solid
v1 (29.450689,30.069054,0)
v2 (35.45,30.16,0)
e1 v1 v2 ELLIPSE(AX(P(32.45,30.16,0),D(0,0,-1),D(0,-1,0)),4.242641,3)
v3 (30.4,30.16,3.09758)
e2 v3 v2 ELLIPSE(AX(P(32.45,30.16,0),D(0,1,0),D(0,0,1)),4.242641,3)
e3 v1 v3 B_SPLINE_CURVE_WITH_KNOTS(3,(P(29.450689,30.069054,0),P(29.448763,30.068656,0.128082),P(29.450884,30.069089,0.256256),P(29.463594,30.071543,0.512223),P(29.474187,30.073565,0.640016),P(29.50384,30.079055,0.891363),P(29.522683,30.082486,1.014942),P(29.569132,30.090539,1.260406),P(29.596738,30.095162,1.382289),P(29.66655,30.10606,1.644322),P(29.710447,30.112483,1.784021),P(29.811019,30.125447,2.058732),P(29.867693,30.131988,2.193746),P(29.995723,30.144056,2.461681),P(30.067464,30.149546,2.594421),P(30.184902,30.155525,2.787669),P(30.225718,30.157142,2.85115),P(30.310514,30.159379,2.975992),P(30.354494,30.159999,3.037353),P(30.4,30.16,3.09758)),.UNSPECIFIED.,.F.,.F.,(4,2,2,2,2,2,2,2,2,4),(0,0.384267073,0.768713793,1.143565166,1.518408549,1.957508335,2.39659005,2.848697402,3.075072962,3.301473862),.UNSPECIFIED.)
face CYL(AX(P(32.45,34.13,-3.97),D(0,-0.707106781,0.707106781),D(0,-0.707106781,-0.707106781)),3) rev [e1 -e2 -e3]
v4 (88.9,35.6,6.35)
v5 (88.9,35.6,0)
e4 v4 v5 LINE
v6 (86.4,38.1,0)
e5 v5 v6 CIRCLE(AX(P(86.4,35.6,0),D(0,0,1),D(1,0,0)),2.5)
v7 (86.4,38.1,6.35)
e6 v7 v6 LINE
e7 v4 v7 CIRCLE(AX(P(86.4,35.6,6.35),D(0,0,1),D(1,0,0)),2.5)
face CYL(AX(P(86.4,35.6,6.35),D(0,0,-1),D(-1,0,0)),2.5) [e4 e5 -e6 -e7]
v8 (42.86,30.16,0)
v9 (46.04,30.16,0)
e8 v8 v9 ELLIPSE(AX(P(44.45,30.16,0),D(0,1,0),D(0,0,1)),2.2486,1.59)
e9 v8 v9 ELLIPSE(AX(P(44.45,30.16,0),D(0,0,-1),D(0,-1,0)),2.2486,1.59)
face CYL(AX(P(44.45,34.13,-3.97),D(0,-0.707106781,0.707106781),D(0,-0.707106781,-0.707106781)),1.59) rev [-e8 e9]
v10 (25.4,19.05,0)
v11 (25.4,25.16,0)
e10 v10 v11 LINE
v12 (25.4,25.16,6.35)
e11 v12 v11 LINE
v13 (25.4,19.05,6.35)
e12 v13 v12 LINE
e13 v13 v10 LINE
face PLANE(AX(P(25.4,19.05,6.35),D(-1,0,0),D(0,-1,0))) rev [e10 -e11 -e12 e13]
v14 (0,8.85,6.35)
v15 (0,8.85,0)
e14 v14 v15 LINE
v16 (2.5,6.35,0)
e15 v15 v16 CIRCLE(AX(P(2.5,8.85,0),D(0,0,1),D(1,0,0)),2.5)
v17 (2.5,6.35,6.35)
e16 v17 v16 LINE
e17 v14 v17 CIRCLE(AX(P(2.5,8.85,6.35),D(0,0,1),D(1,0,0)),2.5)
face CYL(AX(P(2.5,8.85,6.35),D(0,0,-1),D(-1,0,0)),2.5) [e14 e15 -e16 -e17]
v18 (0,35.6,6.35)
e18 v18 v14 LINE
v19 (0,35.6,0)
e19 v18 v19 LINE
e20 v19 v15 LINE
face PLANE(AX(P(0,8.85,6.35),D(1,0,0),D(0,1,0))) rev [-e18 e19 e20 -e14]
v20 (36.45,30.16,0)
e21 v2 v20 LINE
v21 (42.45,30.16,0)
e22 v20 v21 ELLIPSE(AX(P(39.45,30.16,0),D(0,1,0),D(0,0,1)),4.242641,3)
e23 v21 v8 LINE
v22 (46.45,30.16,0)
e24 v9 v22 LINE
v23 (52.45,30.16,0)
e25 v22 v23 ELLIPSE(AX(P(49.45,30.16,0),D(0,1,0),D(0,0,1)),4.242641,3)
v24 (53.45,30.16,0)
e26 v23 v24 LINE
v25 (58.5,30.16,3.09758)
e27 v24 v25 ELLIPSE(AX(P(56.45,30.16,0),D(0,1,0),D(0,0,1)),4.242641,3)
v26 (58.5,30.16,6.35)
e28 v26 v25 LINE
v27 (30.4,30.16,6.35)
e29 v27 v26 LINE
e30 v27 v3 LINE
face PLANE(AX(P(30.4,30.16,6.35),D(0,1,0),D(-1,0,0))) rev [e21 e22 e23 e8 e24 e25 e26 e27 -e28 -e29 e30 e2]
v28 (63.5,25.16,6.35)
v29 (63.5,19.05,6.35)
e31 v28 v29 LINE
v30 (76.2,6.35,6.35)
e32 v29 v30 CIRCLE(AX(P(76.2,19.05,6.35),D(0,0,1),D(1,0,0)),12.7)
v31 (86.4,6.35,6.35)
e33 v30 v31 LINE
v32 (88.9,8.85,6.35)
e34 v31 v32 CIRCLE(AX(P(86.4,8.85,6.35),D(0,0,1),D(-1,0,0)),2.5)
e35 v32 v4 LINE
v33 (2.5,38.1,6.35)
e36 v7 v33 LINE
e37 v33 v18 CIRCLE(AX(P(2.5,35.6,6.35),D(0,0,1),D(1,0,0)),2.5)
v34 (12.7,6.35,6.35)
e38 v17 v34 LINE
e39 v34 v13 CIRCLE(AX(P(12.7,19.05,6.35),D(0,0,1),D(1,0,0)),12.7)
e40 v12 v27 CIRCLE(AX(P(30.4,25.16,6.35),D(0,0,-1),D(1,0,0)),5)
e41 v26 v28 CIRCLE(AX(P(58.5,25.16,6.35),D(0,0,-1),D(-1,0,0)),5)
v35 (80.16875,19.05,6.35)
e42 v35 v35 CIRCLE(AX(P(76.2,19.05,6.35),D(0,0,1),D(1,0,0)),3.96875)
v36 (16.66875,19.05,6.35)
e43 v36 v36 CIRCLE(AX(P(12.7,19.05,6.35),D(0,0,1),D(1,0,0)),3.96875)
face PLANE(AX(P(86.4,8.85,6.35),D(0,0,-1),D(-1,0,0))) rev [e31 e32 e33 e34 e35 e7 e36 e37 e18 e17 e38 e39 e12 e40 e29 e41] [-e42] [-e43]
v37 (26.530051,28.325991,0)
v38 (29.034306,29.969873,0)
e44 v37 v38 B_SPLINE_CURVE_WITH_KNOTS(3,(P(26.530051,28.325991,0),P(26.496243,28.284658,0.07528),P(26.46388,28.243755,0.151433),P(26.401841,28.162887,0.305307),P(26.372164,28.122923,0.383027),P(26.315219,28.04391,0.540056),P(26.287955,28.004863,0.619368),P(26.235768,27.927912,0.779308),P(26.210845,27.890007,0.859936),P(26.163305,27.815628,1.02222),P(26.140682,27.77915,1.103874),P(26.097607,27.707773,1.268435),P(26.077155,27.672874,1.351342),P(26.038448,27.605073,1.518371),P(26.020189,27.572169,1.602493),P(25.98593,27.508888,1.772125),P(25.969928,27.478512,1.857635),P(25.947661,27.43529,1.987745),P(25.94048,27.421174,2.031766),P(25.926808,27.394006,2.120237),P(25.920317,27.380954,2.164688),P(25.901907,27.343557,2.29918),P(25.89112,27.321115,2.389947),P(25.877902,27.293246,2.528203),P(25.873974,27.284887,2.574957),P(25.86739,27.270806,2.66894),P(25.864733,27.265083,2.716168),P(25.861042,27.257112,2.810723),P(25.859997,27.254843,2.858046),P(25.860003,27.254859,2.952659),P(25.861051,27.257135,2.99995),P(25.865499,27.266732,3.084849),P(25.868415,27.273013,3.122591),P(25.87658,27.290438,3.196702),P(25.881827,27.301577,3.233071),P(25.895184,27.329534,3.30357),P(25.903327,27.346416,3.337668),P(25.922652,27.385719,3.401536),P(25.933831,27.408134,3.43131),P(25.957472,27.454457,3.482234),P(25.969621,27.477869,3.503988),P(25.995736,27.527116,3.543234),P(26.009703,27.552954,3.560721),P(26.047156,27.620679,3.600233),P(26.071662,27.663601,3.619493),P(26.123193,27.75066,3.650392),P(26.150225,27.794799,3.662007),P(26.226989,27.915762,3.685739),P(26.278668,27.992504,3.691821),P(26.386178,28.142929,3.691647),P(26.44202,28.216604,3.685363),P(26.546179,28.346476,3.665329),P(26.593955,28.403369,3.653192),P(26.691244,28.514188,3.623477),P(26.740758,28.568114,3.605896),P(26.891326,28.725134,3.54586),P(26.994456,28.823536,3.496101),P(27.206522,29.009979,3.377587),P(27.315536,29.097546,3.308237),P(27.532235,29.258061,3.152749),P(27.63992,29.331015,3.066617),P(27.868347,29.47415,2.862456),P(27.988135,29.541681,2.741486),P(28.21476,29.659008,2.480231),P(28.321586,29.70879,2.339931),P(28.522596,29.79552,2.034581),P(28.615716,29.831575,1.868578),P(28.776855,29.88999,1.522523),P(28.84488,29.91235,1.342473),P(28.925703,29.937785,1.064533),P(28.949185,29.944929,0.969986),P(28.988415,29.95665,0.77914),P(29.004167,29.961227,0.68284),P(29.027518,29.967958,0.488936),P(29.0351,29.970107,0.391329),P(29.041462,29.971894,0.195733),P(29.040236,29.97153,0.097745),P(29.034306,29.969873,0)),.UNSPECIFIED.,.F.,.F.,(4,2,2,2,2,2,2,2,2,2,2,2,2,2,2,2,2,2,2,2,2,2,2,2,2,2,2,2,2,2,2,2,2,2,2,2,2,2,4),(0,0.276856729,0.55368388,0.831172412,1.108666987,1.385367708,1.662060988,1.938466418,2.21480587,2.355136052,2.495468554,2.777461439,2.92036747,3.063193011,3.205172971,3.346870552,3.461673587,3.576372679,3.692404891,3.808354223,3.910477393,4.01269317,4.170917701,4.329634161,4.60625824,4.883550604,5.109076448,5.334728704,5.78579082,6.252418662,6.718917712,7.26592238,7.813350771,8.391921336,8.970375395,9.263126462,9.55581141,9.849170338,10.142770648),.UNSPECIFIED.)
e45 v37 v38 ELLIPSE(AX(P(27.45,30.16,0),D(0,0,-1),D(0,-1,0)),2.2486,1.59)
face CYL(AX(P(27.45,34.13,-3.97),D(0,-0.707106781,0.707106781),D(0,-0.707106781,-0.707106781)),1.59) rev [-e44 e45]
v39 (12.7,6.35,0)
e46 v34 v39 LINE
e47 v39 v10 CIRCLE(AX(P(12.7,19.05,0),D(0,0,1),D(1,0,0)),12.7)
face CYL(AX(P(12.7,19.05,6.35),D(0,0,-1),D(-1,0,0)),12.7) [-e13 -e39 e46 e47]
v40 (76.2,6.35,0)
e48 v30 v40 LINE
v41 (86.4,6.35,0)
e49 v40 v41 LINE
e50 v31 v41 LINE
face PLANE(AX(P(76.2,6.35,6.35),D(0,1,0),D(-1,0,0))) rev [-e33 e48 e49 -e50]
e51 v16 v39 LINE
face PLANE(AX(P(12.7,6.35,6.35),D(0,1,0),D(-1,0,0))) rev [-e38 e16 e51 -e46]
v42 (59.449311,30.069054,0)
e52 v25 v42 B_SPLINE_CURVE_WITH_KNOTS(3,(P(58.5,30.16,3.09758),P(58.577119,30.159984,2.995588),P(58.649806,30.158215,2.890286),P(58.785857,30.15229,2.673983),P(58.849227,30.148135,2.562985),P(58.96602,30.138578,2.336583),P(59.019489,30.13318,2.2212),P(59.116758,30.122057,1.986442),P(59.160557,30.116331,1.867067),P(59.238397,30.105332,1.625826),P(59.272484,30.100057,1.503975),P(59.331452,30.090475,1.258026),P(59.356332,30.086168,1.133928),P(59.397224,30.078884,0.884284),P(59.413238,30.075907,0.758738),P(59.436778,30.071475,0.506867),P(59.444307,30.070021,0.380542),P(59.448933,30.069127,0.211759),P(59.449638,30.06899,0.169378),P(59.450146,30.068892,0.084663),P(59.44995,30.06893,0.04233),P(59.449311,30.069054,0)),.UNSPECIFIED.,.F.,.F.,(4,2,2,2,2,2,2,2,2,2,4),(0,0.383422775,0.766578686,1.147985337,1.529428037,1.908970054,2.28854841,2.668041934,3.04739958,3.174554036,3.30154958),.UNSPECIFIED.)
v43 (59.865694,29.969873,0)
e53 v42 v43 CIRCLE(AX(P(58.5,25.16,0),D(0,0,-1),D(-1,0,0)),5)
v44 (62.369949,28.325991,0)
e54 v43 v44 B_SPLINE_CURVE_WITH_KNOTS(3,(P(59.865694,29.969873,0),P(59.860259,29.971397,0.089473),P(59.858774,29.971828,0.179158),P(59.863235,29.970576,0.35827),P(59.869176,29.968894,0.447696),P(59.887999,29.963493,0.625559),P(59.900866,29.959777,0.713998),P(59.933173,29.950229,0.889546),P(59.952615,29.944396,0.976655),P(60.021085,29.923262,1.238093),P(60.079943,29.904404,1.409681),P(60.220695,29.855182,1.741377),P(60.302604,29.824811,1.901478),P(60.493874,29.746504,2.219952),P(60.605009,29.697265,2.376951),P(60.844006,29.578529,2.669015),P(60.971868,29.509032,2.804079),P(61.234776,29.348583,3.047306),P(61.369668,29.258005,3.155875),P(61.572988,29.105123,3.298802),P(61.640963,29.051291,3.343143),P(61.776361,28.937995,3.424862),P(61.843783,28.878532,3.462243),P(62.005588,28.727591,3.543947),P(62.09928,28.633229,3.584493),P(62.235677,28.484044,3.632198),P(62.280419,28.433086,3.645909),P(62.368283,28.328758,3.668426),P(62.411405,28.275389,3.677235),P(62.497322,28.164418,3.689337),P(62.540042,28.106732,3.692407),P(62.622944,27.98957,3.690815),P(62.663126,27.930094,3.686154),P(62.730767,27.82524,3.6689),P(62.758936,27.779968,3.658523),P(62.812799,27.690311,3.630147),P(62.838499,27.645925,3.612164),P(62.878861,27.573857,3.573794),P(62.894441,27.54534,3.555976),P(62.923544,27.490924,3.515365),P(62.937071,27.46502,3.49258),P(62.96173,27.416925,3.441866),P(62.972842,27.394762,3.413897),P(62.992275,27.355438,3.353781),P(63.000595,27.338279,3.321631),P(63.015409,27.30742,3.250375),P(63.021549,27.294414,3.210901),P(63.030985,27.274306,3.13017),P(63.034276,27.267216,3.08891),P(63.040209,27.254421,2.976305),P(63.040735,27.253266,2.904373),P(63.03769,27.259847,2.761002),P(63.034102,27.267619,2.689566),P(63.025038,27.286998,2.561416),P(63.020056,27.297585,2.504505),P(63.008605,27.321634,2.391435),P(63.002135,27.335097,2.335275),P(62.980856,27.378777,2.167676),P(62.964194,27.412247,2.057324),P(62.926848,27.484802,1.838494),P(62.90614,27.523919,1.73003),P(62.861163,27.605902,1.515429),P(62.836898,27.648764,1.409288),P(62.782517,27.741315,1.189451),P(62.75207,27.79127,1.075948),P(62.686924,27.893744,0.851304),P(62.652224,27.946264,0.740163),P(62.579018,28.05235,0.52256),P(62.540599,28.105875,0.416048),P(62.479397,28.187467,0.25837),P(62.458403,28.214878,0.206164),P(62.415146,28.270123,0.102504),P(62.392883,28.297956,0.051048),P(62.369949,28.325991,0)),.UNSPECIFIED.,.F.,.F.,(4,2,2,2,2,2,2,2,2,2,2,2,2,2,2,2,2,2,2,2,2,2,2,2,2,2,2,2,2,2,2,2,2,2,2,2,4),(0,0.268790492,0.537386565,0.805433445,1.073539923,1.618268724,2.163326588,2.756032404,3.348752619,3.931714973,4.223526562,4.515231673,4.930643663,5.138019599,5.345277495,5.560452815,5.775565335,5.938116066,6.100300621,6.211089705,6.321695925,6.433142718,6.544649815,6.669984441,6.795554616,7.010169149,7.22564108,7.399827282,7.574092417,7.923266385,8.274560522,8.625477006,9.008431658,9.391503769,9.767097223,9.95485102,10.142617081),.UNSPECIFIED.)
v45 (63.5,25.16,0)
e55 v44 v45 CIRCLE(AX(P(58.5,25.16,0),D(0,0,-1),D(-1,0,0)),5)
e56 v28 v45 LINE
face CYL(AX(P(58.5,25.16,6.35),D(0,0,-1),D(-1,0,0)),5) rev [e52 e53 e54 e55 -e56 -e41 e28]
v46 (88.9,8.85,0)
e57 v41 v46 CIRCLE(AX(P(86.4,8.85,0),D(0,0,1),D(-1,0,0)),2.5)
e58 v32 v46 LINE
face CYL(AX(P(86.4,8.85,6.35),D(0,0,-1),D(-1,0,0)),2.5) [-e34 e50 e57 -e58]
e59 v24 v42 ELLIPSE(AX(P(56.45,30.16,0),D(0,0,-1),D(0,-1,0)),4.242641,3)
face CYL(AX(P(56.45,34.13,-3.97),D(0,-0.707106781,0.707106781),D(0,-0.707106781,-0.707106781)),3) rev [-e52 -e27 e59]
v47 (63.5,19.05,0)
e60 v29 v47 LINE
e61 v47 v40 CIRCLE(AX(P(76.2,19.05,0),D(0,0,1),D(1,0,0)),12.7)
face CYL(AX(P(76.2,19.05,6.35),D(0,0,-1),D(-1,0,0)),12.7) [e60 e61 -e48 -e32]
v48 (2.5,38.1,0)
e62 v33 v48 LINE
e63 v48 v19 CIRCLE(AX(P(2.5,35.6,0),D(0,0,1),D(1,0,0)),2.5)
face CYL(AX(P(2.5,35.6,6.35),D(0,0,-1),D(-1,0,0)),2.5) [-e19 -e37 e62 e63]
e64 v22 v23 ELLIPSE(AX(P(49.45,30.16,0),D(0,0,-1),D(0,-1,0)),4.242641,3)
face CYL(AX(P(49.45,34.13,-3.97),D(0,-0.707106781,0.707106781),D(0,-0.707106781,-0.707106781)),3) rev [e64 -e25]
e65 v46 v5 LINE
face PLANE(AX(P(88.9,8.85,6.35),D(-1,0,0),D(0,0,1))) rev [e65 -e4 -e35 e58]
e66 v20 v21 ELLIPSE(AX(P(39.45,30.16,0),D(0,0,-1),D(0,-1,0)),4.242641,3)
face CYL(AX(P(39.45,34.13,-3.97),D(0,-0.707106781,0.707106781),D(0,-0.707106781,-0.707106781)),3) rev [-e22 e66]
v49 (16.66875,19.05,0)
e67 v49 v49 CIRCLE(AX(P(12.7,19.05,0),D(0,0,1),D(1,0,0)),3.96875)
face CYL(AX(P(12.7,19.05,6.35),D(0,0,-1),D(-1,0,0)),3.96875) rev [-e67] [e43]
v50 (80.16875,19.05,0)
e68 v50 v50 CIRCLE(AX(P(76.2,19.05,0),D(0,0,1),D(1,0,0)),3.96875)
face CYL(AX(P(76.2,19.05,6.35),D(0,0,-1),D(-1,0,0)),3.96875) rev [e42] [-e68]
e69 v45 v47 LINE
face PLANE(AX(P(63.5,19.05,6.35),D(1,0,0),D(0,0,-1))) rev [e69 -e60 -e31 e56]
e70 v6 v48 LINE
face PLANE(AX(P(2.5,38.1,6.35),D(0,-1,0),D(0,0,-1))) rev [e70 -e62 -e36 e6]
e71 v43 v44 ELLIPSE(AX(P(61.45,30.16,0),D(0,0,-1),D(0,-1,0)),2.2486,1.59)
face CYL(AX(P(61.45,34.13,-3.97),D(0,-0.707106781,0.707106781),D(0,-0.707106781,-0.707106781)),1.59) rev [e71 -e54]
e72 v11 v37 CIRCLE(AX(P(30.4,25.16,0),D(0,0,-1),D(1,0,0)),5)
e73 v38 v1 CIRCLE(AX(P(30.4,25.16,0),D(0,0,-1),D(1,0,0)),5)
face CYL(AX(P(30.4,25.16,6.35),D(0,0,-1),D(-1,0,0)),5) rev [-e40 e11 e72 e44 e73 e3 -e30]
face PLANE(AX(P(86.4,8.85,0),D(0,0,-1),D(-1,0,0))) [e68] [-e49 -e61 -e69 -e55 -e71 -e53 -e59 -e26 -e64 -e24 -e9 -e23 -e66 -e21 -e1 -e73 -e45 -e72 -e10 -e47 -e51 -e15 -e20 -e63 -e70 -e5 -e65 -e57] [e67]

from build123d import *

# Parameters (mm, degrees)
SKETCH2_R               = 3.96875
BOSS_EXTRUDE1_DEPTH     = 6.35
CUT_EXTRUDE1_DEPTH      = 95.292689271
CUT_EXTRUDE1_DEPTH_BACK = 95.292689271
SKETCH3_R               = 3
SKETCH3_R_2             = 1.59


with BuildPart() as part:
    # Sketch2 → Boss-Extrude1 (new body)
    with BuildSketch(Plane.XY):
        with BuildLine():
            Line((2.5, 38.1), (86.4, 38.1))
            ThreePointArc((86.4, 38.1), (88.167766953, 37.367766953), (88.9, 35.6))
            Line((88.9, 35.6), (88.9, 8.85))
            ThreePointArc((88.9, 8.85), (88.167766953, 7.082233047), (86.4, 6.35))
            Line((86.4, 6.35), (76.2, 6.35))
            ThreePointArc((76.2, 6.35), (67.219743879, 10.069743879), (63.5, 19.05))
            Line((63.5, 19.05), (63.5, 25.16))
            ThreePointArc((63.5, 25.16), (62.035533906, 28.695533906), (58.5, 30.16))
            Line((58.5, 30.16), (30.4, 30.16))
            ThreePointArc((30.4, 30.16), (26.864466094, 28.695533906), (25.4, 25.16))
            Line((25.4, 25.16), (25.4, 19.05))
            ThreePointArc((25.4, 19.05), (21.680256121, 10.069743879), (12.7, 6.35))
            Line((12.7, 6.35), (2.5, 6.35))
            ThreePointArc((2.5, 6.35), (0.732233047, 7.082233047), (0, 8.85))
            Line((0, 8.85), (0, 35.6))
            ThreePointArc((0, 35.6), (0.732233047, 37.367766953), (2.5, 38.1))
        make_face()
        with Locations((12.7, 19.05)):
            Circle(SKETCH2_R, mode=Mode.SUBTRACT)
        with Locations((76.2, 19.05)):
            Circle(SKETCH2_R, mode=Mode.SUBTRACT)
    extrude(amount=BOSS_EXTRUDE1_DEPTH)

    # Sketch3 → Cut-Extrude1 (cut, two sides: drawn at the far end of the back side and taken through both)
    with BuildSketch(Plane(origin=(0, 15.875, -15.875), x_dir=(1, 0, 0), z_dir=(0, -0.7071067811865475, 0.7071067811865477)).offset(-CUT_EXTRUDE1_DEPTH_BACK)):
        with Locations((56.45, 21.326340521)):
            Circle(SKETCH3_R)
        with Locations((49.45, 21.326340521)):
            Circle(SKETCH3_R)
        with Locations((44.45, 21.326340521)):
            Circle(SKETCH3_R_2)
        with Locations((39.45, 21.326340521)):
            Circle(SKETCH3_R)
        with Locations((32.45, 21.326340521)):
            Circle(SKETCH3_R)
        with Locations((61.45, 21.326340521)):
            Circle(SKETCH3_R_2)
        with Locations((27.45, 21.326340521)):
            Circle(SKETCH3_R_2)
    extrude(amount=CUT_EXTRUDE1_DEPTH + CUT_EXTRUDE1_DEPTH_BACK, mode=Mode.SUBTRACT)


solid = part.part
